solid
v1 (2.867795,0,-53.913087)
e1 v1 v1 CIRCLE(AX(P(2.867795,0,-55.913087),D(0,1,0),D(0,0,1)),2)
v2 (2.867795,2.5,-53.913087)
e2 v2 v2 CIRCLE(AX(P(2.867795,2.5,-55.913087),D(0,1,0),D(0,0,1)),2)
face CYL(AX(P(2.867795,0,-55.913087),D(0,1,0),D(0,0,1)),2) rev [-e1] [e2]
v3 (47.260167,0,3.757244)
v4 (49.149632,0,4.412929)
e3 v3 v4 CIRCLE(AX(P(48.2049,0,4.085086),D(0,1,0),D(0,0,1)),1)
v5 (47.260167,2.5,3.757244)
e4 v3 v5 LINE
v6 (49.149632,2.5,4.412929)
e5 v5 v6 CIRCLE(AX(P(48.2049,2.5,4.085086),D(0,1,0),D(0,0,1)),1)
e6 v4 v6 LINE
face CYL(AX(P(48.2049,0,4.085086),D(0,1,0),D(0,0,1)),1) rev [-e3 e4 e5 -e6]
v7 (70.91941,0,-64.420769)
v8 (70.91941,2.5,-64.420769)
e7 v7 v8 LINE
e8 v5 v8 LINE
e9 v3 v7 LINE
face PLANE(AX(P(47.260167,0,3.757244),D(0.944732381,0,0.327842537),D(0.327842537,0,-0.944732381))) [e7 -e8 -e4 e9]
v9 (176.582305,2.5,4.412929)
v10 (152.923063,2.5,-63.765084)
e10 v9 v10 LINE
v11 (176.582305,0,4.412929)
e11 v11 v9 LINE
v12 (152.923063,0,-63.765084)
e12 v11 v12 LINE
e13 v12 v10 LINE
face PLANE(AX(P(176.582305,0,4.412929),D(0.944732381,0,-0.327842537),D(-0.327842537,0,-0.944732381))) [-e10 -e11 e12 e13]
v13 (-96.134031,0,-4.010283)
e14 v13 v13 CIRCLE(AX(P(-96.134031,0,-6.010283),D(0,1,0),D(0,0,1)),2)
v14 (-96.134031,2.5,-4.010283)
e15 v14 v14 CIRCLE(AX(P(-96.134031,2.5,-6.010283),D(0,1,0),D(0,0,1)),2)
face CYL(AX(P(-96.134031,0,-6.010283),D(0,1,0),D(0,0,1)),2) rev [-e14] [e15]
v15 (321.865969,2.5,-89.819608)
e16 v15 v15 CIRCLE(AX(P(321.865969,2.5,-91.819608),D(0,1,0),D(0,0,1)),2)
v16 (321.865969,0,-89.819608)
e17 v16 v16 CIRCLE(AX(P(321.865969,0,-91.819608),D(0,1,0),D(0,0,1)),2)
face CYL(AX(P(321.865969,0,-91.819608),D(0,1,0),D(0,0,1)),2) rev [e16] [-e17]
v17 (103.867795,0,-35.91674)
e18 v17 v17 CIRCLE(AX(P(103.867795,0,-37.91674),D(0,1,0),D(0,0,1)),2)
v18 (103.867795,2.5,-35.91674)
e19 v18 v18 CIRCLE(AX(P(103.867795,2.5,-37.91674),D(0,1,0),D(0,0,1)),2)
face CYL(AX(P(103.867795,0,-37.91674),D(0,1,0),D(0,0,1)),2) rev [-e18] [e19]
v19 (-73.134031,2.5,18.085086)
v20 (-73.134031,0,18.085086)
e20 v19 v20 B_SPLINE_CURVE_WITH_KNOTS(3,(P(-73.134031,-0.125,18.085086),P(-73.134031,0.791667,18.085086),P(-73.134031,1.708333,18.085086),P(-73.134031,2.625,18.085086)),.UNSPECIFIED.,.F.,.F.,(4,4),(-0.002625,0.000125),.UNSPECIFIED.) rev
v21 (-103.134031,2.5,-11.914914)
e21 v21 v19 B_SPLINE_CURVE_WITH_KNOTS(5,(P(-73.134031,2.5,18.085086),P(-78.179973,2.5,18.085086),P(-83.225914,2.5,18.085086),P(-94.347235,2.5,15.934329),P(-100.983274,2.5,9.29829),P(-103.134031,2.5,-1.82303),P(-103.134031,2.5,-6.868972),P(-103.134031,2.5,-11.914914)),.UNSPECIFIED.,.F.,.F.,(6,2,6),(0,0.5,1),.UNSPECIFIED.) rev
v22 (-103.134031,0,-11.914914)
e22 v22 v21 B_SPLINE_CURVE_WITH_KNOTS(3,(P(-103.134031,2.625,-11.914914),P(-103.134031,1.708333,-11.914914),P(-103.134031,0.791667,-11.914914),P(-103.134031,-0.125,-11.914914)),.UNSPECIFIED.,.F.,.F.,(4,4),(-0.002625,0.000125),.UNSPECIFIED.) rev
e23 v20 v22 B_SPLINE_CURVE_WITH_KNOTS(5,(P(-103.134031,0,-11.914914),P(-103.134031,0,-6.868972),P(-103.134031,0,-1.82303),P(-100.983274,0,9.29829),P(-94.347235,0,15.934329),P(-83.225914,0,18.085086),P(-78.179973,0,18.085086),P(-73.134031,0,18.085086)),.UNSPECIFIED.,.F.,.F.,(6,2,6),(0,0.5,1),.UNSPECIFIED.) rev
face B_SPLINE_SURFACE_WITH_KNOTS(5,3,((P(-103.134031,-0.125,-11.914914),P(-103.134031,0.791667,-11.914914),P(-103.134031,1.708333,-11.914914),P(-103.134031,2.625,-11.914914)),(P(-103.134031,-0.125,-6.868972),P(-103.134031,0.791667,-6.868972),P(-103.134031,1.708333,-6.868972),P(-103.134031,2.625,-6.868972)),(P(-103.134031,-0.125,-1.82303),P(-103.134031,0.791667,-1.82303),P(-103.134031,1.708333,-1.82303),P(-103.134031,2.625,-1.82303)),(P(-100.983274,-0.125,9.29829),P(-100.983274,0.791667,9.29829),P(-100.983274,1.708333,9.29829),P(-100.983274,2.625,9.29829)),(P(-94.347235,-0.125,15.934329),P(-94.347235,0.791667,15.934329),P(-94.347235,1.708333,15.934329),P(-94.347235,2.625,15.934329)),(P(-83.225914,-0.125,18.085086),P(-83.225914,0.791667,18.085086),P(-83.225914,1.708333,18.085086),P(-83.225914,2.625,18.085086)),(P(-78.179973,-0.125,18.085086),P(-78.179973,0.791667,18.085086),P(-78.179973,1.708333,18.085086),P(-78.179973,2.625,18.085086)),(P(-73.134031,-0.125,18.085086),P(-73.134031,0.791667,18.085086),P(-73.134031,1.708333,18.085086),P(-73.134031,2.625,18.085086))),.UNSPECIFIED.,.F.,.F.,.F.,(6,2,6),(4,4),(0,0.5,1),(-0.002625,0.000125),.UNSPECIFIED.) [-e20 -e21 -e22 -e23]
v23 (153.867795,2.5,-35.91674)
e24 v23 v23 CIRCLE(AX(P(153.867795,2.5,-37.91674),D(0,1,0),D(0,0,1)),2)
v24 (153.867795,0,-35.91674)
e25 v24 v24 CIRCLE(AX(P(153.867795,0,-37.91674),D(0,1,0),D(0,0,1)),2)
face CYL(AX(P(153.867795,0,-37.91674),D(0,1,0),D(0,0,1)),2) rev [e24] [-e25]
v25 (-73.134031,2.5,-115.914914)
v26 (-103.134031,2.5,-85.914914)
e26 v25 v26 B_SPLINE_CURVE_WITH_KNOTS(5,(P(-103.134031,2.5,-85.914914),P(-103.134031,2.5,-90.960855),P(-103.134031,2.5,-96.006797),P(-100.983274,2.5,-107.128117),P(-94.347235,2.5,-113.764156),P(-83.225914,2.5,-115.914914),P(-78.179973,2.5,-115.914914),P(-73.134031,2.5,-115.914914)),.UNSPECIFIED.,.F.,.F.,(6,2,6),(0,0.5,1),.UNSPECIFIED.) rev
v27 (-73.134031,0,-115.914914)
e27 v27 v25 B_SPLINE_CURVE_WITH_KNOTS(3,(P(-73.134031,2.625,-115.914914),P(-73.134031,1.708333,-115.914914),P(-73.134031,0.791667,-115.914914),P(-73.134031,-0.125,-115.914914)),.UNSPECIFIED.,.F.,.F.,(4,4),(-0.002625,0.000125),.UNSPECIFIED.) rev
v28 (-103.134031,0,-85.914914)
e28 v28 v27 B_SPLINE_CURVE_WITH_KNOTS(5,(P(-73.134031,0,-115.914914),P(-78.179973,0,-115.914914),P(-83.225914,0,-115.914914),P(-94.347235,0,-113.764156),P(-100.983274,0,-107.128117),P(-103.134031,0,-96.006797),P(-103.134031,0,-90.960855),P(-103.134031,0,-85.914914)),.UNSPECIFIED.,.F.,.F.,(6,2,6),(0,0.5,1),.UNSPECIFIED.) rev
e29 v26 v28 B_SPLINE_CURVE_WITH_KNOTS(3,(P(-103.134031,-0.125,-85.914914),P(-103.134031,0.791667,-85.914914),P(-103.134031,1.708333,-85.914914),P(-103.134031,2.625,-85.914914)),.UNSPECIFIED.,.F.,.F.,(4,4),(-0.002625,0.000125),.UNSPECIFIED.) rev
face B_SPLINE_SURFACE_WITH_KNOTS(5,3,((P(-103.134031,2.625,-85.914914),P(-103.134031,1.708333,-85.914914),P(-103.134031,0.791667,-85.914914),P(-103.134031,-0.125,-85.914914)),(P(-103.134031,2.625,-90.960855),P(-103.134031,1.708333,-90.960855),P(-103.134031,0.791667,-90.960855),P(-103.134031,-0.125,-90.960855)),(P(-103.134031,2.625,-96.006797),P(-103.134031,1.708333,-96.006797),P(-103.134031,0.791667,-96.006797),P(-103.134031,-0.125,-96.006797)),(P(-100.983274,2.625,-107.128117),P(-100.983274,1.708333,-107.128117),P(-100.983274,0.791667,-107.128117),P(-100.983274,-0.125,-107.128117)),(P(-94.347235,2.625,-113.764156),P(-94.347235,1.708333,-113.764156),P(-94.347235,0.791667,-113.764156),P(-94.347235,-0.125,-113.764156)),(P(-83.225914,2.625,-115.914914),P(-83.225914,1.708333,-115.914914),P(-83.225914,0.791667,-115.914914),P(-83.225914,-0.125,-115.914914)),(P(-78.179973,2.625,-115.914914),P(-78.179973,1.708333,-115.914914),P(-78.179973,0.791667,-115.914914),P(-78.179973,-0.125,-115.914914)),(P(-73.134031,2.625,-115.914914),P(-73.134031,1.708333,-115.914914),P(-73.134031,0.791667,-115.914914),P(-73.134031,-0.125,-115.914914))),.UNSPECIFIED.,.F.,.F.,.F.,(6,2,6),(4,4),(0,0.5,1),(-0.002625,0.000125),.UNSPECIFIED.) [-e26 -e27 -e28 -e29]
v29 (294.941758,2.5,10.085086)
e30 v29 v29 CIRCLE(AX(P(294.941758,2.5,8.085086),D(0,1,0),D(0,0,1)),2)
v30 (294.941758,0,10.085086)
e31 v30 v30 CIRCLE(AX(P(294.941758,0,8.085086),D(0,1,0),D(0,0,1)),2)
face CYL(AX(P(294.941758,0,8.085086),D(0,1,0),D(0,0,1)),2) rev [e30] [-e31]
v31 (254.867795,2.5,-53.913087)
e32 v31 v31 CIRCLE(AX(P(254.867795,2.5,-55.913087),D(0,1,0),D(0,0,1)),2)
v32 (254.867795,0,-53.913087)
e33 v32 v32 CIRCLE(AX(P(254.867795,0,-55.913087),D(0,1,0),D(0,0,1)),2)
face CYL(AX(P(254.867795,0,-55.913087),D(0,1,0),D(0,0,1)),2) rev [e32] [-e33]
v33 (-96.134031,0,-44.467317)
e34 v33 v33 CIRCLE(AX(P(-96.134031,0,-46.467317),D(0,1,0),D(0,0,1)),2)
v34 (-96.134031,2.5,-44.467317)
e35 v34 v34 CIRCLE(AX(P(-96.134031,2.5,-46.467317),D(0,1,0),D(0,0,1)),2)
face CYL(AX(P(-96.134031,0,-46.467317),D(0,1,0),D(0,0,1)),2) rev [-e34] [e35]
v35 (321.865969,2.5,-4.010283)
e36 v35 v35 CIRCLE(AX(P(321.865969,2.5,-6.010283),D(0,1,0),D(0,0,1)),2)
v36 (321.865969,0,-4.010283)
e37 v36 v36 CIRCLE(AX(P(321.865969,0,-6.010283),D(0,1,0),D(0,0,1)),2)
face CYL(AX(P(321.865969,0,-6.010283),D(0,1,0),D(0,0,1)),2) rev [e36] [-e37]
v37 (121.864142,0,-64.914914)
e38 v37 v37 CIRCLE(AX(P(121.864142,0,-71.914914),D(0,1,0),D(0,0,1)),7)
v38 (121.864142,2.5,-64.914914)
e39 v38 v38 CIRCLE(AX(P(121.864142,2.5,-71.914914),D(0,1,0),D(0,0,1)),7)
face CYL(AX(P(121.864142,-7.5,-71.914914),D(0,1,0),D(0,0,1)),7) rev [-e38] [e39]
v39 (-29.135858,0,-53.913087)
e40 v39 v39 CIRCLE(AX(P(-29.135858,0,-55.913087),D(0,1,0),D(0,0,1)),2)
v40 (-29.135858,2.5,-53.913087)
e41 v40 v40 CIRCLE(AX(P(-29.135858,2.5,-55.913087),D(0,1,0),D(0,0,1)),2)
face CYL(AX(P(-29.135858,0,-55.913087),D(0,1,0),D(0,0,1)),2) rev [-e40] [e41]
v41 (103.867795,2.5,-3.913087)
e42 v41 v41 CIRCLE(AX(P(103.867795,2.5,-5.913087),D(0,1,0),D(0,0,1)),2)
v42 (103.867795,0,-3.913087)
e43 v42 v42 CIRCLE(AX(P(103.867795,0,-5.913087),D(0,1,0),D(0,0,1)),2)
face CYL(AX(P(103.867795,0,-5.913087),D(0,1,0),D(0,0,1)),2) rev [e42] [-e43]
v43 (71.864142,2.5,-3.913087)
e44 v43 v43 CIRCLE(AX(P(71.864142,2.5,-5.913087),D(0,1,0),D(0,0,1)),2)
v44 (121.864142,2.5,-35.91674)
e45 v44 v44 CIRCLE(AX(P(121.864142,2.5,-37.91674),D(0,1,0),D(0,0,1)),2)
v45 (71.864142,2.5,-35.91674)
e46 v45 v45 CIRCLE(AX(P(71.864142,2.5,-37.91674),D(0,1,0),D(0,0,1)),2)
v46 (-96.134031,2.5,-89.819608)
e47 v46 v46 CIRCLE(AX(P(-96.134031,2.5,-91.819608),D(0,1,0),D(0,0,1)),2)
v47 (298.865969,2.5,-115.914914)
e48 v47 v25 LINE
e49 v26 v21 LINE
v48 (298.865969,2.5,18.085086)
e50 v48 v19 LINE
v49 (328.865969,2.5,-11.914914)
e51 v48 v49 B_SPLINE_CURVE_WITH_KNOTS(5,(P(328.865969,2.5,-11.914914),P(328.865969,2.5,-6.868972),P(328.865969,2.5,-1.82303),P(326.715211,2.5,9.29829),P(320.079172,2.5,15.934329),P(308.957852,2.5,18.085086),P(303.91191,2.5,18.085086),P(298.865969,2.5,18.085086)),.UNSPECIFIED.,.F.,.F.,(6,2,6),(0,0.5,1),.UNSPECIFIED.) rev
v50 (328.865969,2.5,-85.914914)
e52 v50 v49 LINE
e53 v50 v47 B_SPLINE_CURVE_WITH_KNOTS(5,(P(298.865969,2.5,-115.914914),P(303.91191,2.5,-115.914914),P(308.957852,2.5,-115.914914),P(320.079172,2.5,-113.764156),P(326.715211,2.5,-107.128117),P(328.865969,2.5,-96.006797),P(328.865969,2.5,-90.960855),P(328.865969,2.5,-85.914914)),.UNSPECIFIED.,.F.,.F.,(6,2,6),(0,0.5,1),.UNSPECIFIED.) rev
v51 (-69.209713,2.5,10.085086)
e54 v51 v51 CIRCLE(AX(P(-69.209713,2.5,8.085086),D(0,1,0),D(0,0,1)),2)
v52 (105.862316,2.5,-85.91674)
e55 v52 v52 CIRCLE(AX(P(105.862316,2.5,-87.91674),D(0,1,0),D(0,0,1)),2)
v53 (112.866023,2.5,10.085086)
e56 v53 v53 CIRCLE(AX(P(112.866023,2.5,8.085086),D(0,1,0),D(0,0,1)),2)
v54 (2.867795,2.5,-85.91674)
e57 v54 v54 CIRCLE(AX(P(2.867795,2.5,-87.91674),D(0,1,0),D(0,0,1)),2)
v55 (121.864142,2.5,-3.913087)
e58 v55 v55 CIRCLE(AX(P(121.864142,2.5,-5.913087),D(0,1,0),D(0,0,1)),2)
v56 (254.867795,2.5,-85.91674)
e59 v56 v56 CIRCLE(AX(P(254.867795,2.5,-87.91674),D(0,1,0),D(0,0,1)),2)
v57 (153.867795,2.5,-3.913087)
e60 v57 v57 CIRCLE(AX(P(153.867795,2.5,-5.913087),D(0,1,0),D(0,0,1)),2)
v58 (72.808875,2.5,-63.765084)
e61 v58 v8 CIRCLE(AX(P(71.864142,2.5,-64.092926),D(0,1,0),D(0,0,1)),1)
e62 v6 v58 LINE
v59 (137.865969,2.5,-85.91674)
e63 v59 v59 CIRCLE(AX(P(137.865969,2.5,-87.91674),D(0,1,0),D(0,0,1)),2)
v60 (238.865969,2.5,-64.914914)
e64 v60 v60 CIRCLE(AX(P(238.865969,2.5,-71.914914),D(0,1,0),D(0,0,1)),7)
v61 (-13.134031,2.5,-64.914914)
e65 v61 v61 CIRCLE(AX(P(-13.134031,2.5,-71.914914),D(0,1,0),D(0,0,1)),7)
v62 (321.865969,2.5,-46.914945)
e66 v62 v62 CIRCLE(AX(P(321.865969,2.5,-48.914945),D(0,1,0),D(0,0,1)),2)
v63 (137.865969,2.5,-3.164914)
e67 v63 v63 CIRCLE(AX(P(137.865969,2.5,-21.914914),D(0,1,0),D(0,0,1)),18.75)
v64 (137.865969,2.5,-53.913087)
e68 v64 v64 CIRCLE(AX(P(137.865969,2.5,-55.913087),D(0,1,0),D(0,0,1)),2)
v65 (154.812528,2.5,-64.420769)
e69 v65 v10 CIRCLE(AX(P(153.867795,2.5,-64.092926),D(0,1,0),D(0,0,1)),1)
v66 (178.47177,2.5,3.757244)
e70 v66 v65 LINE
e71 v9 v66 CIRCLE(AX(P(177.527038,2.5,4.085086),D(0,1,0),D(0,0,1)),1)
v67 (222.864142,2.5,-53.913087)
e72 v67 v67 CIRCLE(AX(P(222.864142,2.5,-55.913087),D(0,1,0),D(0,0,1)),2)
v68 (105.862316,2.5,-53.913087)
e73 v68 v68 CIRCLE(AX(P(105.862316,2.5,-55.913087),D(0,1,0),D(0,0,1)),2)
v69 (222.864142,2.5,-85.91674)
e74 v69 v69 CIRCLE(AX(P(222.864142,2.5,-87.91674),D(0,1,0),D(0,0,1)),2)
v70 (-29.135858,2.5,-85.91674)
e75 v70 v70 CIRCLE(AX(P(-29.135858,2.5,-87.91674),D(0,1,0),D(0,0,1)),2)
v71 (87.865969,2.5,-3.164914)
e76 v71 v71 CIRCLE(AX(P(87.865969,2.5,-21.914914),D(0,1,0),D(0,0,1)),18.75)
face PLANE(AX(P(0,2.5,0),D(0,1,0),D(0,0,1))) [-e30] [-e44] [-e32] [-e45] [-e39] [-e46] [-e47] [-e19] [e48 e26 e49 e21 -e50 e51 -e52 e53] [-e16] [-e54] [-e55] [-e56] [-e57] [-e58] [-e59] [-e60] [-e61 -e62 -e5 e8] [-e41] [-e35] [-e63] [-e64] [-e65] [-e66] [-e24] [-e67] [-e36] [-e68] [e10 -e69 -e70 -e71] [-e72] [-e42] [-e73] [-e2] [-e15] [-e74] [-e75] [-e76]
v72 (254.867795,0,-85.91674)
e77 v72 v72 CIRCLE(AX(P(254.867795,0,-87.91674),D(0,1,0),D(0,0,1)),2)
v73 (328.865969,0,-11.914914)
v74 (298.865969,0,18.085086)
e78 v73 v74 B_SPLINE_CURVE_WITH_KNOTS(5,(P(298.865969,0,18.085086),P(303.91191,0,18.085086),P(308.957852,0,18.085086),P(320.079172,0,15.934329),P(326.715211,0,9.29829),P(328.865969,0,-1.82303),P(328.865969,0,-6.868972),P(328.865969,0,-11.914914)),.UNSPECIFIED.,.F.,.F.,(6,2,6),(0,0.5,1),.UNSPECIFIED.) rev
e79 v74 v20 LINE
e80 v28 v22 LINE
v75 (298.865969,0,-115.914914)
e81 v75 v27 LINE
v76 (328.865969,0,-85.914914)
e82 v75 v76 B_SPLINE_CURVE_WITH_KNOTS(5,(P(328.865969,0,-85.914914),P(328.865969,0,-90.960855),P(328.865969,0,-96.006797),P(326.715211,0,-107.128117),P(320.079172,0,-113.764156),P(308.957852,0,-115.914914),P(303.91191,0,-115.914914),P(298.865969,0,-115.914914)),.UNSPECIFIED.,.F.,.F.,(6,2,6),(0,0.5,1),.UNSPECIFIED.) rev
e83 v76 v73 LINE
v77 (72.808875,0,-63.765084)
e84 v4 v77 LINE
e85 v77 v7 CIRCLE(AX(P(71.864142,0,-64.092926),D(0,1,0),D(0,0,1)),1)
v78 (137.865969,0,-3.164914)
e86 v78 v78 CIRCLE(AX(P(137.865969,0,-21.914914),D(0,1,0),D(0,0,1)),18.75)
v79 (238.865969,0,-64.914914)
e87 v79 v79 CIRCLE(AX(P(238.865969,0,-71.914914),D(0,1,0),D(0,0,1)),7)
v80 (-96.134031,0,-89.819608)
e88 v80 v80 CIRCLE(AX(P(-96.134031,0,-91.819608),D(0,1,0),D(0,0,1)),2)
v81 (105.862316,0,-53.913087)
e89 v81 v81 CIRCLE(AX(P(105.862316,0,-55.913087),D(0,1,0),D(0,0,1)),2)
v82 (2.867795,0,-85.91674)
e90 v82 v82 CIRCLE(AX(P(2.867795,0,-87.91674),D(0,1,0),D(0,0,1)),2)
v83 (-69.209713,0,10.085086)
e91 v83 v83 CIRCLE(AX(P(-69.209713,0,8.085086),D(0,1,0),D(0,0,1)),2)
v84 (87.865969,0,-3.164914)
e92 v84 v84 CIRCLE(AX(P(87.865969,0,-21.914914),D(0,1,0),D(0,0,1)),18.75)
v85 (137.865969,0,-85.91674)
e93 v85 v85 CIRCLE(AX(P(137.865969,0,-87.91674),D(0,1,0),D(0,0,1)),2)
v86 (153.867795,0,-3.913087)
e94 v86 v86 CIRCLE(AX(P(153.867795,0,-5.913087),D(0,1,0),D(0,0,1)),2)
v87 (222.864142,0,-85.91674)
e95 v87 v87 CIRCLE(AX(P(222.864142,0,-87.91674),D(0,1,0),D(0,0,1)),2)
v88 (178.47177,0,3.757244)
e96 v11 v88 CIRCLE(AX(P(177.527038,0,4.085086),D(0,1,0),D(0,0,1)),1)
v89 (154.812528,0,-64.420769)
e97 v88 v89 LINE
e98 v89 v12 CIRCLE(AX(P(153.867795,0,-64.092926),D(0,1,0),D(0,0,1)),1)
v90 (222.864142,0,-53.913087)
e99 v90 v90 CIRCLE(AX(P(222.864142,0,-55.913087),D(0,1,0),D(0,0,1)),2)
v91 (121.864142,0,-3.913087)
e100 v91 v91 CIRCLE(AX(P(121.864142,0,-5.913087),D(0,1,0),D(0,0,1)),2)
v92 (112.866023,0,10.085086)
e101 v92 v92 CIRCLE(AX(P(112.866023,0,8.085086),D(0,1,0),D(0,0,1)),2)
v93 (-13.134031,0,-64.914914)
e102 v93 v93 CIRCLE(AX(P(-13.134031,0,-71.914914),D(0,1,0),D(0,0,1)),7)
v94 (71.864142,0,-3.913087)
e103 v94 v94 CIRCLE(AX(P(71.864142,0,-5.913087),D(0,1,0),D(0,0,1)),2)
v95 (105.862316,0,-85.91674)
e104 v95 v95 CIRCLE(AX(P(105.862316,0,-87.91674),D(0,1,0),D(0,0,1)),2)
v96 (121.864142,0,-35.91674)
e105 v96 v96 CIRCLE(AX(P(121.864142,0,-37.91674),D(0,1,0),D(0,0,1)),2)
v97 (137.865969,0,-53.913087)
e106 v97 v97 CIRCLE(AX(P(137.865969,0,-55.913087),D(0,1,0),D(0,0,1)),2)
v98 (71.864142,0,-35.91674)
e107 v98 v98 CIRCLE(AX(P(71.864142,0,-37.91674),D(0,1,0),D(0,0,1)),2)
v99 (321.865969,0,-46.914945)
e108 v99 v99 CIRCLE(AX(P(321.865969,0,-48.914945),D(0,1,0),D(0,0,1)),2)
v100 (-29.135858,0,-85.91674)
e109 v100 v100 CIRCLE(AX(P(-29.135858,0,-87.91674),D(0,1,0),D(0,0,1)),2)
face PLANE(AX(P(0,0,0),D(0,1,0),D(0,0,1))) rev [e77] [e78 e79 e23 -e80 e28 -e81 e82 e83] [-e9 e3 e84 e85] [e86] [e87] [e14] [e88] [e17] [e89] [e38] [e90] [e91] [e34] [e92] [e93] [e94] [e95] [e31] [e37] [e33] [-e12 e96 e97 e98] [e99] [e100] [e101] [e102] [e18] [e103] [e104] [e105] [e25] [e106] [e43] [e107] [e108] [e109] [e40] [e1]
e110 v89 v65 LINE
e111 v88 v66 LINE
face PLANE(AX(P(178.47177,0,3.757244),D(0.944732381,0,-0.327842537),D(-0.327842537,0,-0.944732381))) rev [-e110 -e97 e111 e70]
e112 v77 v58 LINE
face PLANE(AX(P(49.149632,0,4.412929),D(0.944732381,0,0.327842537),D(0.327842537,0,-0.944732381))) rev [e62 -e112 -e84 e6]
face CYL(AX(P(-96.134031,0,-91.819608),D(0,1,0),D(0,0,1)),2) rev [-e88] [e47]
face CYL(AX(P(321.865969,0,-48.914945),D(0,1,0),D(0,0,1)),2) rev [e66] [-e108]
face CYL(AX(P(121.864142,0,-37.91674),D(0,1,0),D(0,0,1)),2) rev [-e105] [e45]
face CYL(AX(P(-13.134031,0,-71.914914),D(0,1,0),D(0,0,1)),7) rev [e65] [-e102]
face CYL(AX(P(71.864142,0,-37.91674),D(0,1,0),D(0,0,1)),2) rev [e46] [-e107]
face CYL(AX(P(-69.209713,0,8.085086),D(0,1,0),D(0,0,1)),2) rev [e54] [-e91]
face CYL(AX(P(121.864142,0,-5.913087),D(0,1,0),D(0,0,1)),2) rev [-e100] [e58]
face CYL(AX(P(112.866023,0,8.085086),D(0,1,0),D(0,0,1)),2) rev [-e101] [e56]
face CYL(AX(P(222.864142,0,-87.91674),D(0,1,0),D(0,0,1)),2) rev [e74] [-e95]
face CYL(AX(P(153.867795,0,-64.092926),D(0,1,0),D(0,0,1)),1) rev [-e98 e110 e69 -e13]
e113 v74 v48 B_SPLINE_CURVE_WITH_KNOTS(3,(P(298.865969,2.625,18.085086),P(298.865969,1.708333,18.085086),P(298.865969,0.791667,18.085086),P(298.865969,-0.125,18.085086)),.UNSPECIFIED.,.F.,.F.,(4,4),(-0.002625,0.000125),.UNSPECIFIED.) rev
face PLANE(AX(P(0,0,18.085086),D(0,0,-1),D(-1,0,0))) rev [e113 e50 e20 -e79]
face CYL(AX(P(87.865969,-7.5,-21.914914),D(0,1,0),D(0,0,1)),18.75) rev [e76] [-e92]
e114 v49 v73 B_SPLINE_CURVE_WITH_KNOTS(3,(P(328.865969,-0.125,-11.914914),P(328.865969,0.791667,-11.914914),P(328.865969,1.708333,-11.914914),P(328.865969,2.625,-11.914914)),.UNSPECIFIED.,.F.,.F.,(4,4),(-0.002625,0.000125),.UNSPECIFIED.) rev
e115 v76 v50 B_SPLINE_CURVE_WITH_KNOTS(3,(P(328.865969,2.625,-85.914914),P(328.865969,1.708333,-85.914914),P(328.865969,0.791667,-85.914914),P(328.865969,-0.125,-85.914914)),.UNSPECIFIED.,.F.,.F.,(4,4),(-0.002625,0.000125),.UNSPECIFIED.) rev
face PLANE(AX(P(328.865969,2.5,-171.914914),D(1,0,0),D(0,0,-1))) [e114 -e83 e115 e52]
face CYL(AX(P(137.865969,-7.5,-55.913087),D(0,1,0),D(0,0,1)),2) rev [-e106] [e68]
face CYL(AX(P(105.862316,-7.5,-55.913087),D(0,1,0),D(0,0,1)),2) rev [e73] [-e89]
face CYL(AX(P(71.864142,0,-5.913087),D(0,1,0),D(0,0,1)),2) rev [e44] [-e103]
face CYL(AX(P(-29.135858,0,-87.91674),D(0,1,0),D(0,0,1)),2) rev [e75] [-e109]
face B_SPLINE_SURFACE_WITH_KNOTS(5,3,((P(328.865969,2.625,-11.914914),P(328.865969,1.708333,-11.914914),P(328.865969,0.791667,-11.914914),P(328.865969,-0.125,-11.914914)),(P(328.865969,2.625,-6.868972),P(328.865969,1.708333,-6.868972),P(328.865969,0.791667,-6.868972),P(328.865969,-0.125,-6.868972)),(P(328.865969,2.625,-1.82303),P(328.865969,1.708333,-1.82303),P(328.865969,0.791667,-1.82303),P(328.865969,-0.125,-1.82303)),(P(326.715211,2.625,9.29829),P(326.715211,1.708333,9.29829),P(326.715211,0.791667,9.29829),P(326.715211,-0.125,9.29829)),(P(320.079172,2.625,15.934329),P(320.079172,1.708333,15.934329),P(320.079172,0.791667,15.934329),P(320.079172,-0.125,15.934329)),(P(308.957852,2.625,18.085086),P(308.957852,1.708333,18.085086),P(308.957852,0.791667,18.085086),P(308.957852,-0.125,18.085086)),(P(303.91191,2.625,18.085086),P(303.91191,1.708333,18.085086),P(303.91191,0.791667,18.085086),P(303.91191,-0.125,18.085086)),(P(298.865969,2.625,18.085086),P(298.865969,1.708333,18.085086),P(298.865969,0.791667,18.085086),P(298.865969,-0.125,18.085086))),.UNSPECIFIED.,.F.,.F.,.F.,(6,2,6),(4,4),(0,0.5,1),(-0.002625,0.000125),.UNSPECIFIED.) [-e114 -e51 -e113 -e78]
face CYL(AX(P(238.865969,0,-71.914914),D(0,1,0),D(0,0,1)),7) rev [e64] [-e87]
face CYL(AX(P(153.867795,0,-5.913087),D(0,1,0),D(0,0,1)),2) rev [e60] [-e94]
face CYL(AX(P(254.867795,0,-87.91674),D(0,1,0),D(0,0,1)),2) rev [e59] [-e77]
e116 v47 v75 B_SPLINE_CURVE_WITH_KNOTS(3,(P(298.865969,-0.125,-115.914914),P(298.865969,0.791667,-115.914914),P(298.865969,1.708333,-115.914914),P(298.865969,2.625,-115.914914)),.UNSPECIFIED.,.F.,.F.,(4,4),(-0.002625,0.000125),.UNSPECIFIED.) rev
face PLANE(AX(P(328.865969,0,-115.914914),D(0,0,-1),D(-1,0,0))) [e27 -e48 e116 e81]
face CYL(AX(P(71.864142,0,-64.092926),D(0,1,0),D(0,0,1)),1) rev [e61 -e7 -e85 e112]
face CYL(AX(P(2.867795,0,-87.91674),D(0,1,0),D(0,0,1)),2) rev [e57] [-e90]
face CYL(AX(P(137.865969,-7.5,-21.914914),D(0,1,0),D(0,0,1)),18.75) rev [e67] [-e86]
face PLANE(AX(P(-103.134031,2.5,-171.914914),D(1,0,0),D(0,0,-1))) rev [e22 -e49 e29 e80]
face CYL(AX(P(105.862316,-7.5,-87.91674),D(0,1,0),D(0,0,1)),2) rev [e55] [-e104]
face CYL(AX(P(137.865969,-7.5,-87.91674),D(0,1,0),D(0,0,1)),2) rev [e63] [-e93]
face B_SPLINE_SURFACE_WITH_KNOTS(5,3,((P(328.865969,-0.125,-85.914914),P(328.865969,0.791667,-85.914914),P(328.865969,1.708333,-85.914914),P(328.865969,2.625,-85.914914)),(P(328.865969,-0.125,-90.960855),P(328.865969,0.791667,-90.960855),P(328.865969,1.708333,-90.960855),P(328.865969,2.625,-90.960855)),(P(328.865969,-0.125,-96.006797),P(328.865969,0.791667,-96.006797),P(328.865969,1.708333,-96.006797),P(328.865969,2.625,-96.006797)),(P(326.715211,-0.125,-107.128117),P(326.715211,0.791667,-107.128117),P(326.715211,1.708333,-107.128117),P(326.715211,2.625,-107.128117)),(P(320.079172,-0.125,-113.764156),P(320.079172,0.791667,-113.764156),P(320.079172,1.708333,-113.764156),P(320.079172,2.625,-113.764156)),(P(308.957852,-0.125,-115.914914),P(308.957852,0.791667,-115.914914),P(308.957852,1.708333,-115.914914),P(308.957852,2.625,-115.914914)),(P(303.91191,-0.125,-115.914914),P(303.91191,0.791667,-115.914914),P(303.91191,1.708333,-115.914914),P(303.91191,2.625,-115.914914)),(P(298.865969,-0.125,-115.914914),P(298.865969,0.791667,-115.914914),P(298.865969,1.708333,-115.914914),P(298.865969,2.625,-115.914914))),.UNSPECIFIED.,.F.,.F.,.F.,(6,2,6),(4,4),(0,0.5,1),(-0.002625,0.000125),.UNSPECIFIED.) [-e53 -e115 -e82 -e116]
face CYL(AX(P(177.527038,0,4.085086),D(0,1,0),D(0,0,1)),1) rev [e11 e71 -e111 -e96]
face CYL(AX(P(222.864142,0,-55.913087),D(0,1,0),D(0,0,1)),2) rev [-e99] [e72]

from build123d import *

# Parameters (mm, degrees)
SKETCH1_W           = 432
SKETCH1_H           = 200
BOSS_EXTRUDE1_DEPTH = 2.5
SKETCH3_R           = 7
SKETCH3_R_2         = 2
SKETCH3_W           = 498.20945101
SKETCH3_H           = 57.36356312
CUT_EXTRUDE1_DEPTH  = 2.5
SKETCH5_W           = 366.875294571
SKETCH5_H           = 10
SKETCH5_W_2         = 65.124705429
CUT_EXTRUDE3_DEPTH  = 2.5
SKETCH6_R           = 2
CUT_EXTRUDE4_DEPTH  = 2.5
CUT_EXTRUDE5_DEPTH  = 2.5
FILLET1_SIZE        = 30
SKETCH9_R           = 2
CUT_EXTRUDE6_DEPTH  = 2.5
SKETCH10_R          = 2
CUT_EXTRUDE7_DEPTH  = 2.5
SKETCH6_3_R         = 18.75
CUT_EXTRUDE8_DEPTH  = 10
SKETCH12_R          = 7
SKETCH12_R_2        = 2
CUT_EXTRUDE9_DEPTH  = 10


with BuildPart() as part:
    # Sketch1 → Boss-Extrude1 (new body)
    with BuildSketch(Plane(origin=(0, 0, 0), x_dir=(1, 0, 0), z_dir=(0, 1, 0))):
        with Locations((112.865968756, 71.914913526)):
            Rectangle(SKETCH1_W, SKETCH1_H)
    extrude(amount=BOSS_EXTRUDE1_DEPTH)

    # Sketch3 → Cut-Extrude1 (cut)
    with BuildSketch(Plane(origin=(0, 2.5, 0), x_dir=(1, 0, 0), z_dir=(0, 1, 0))):
        with Locations(Location((-13.134031244, 71.914913526, 0), (0, 0, 270))):
            Circle(SKETCH3_R)
        with Locations(Location((-29.135857702, 55.913087067, 0), (0, 0, 270))):
            Circle(SKETCH3_R_2)
        with Locations(Location((-29.135857702, 87.916739984, 0), (0, 0, 270))):
            Circle(SKETCH3_R_2)
        with Locations(Location((2.867795214, 55.913087067, 0), (0, 0, 270))):
            Circle(SKETCH3_R_2)
        with Locations(Location((2.867795214, 87.916739984, 0), (0, 0, 270))):
            Circle(SKETCH3_R_2)
        with Locations(Location((238.865968756, 71.914913526, 0), (0, 0, 270))):
            Circle(SKETCH3_R)
        with Locations((79.761243251, 144.596695086)):
            Rectangle(SKETCH3_W, SKETCH3_H)
        with Locations(Location((222.864142298, 55.913087067, 0), (0, 0, 270))):
            Circle(SKETCH3_R_2)
        with Locations(Location((254.867795214, 87.916739984, 0), (0, 0, 270))):
            Circle(SKETCH3_R_2)
        with Locations(Location((222.864142298, 87.916739984, 0), (0, 0, 270))):
            Circle(SKETCH3_R_2)
        with Locations(Location((254.867795214, 55.913087067, 0), (0, 0, 270))):
            Circle(SKETCH3_R_2)
    extrude(amount=-CUT_EXTRUDE1_DEPTH, mode=Mode.SUBTRACT)

    # Sketch5 → Cut-Extrude3 (cut)
    with BuildSketch(Plane(origin=(0, 2.5, 0), x_dir=(1, 0, 0), z_dir=(0, 1, 0))):
        with Locations((80.303616041, -23.085086474)):
            Rectangle(SKETCH5_W, SKETCH5_H)
        with Locations((296.303616042, -23.085086474)):
            Rectangle(SKETCH5_W_2, SKETCH5_H)
    extrude(amount=-CUT_EXTRUDE3_DEPTH, mode=Mode.SUBTRACT)

    # Sketch6 → Cut-Extrude4 (cut)
    with BuildSketch(Plane(origin=(0, 2.5, 0), x_dir=(1, 0, 0), z_dir=(0, 1, 0))):
        with Locations(Location((71.864142298, 5.913087067, 0), (0, 0, 270))):
            Circle(SKETCH6_R)
        with Locations(Location((71.864142298, 37.916739984, 0), (0, 0, 270))):
            Circle(SKETCH6_R)
        with Locations(Location((103.867795214, 37.916739984, 0), (0, 0, 270))):
            Circle(SKETCH6_R)
        with Locations(Location((103.867795214, 5.913087067, 0), (0, 0, 270))):
            Circle(SKETCH6_R)
        with Locations(Location((121.864142298, 5.913087067, 0), (0, 0, 270))):
            Circle(SKETCH6_R)
        with Locations(Location((121.864142298, 37.916739984, 0), (0, 0, 270))):
            Circle(SKETCH6_R)
        with Locations(Location((153.867795214, 37.916739984, 0), (0, 0, 270))):
            Circle(SKETCH6_R)
        with Locations(Location((153.867795214, 5.913087067, 0), (0, 0, 270))):
            Circle(SKETCH6_R)
    extrude(amount=-CUT_EXTRUDE4_DEPTH, mode=Mode.SUBTRACT)

    # Sketch8 → Cut-Extrude5 (cut)
    with BuildSketch(Plane(origin=(0, 2.5, 0), x_dir=(1, 0, 0), z_dir=(0, 1, 0))):
        with BuildLine():
            Line((176.582305496, -4.412929011), (152.923062834, 63.765083659))
            ThreePointArc((152.923062834, 63.765083659), (153.539952677, 65.037658577), (154.812527595, 64.420768733))
            Line((154.812527595, 64.420768733), (178.471770257, -3.757243937))
            ThreePointArc((178.471770257, -3.757243937), (177.854880414, -5.029818855), (176.582305496, -4.412929011))
        make_face()
        with BuildLine():
            Line((47.260167255, -3.757243937), (70.919409917, 64.420768733))
            ThreePointArc((70.919409917, 64.420768733), (72.191984835, 65.037658577), (72.808874679, 63.765083659))
            Line((72.808874679, 63.765083659), (49.149632016, -4.412929011))
            ThreePointArc((49.149632016, -4.412929011), (47.877057099, -5.029818855), (47.260167255, -3.757243937))
        make_face()
    extrude(amount=-CUT_EXTRUDE5_DEPTH, mode=Mode.SUBTRACT)

    # Fillet1
    # a fillet whose section is not a circle: 30 mm, written as the material it takes off along each edge
    with BuildSketch(Plane(origin=(-103.134031244, -75, -115.914913526), x_dir=(0, 0, 1), z_dir=(0, 1, 0)), Plane(origin=(-103.134031244, 77.5, 18.085086474), x_dir=(0, 0, -1), z_dir=(0, -1, 0)), Plane(origin=(328.865968756, 77.5, 18.085086474), x_dir=(-1, 0, 0), z_dir=(0, -1, 0))) as fillet1_piece_1:
        with BuildLine():
            add(Edge.make_bspline([(FILLET1_SIZE, 0), (FILLET1_SIZE * 0.831801948466, 0), (FILLET1_SIZE * 0.663603896932, 0), (FILLET1_SIZE * 0.292893218813, FILLET1_SIZE * 0.0716919198361), (FILLET1_SIZE * 0.0716919198361, FILLET1_SIZE * 0.292893218813), (0, FILLET1_SIZE * 0.663603896932), (0, FILLET1_SIZE * 0.831801948466), (0, FILLET1_SIZE)], knots=[0, 0, 0, 0, 0, 0, 0.5, 0.5, 1, 1, 1, 1, 1, 1], degree=5))
            Line((0, FILLET1_SIZE), (0, 0))
            Line((0, 0), (FILLET1_SIZE, 0))
        make_face()
    extrude(amount=152.5, mode=Mode.SUBTRACT)
    with BuildSketch(Plane(origin=(328.865968756, 77.5, -115.914913526), x_dir=(-1, 0, 0), z_dir=(0, -1, 0))) as fillet1_piece_2:
        with BuildLine():
            add(Edge.make_bspline([(FILLET1_SIZE, 0), (FILLET1_SIZE * 0.831801948466, 0), (FILLET1_SIZE * 0.663603896932, 0), (FILLET1_SIZE * 0.292893218813, -FILLET1_SIZE * 0.0716919198361), (FILLET1_SIZE * 0.0716919198361, -FILLET1_SIZE * 0.292893218813), (0, -FILLET1_SIZE * 0.663603896932), (0, -FILLET1_SIZE * 0.831801948466), (0, -FILLET1_SIZE)], knots=[0, 0, 0, 0, 0, 0, 0.5, 0.5, 1, 1, 1, 1, 1, 1], degree=5))
            Line((0, -FILLET1_SIZE), (0, 0))
            Line((0, 0), (FILLET1_SIZE, 0))
        make_face()
    extrude(amount=152.5, mode=Mode.SUBTRACT)

    # Sketch9 → Cut-Extrude6 (cut)
    with BuildSketch(Plane(origin=(0, 2.5, 0), x_dir=(1, 0, 0), z_dir=(0, 1, 0))):
        with Locations(Location((321.865968752, 6.010283068, 0), (0, 0, 270))):
            Circle(SKETCH9_R)
        with Locations(Location((321.865968752, 48.914945481, 0), (0, 0, 270))):
            Circle(SKETCH9_R)
        with Locations(Location((321.865968752, 91.819607898, 0), (0, 0, 270))):
            Circle(SKETCH9_R)
        with Locations(Location((-96.134031244, 46.467317494, 0), (0, 0, 270))):
            Circle(SKETCH9_R)
        with Locations(Location((-96.134031244, 91.819607898, 0), (0, 0, 270))):
            Circle(SKETCH9_R)
        with Locations(Location((-96.134031244, 6.010283068, 0), (0, 0, 270))):
            Circle(SKETCH9_R)
    extrude(amount=-CUT_EXTRUDE6_DEPTH, mode=Mode.SUBTRACT)

    # Sketch10 → Cut-Extrude7 (cut)
    with BuildSketch(Plane(origin=(0, 2.5, 0), x_dir=(1, 0, 0), z_dir=(0, 1, 0))):
        with Locations(Location((112.866022655, -8.085086472, 0), (0, 0, 270))):
            Circle(SKETCH10_R)
        with Locations(Location((294.941757967, -8.085086472, 0), (0, 0, 270))):
            Circle(SKETCH10_R)
        with Locations(Location((-69.209712656, -8.085086472, 0), (0, 0, 270))):
            Circle(SKETCH10_R)
    extrude(amount=-CUT_EXTRUDE7_DEPTH, mode=Mode.SUBTRACT)

    # Sketch6<3> → Cut-Extrude8 (cut)
    with BuildSketch(Plane(origin=(0, 2.5, 0), x_dir=(1, 0, 0), z_dir=(0, 1, 0))):
        with Locations(Location((137.865968756, 21.914913526, 0), (0, 0, 270))):
            Circle(SKETCH6_3_R)
        with Locations(Location((87.865968756, 21.914913526, 0), (0, 0, 270))):
            Circle(SKETCH6_3_R)
    extrude(amount=-CUT_EXTRUDE8_DEPTH, mode=Mode.SUBTRACT)

    # Sketch12 → Cut-Extrude9 (cut)
    with BuildSketch(Plane(origin=(0, 2.5, 0), x_dir=(1, 0, 0), z_dir=(0, 1, 0))):
        with Locations(Location((121.864142298, 71.914913526, 0), (0, 0, 270))):
            Circle(SKETCH12_R)
        with Locations(Location((105.86231584, 55.913087067, 0), (0, 0, 270))):
            Circle(SKETCH12_R_2)
        with Locations(Location((105.86231584, 87.916739984, 0), (0, 0, 270))):
            Circle(SKETCH12_R_2)
        with Locations(Location((137.865968756, 87.916739984, 0), (0, 0, 270))):
            Circle(SKETCH12_R_2)
        with Locations(Location((137.865968756, 55.913087067, 0), (0, 0, 270))):
            Circle(SKETCH12_R_2)
    extrude(amount=-CUT_EXTRUDE9_DEPTH, mode=Mode.SUBTRACT)


solid = part.part
